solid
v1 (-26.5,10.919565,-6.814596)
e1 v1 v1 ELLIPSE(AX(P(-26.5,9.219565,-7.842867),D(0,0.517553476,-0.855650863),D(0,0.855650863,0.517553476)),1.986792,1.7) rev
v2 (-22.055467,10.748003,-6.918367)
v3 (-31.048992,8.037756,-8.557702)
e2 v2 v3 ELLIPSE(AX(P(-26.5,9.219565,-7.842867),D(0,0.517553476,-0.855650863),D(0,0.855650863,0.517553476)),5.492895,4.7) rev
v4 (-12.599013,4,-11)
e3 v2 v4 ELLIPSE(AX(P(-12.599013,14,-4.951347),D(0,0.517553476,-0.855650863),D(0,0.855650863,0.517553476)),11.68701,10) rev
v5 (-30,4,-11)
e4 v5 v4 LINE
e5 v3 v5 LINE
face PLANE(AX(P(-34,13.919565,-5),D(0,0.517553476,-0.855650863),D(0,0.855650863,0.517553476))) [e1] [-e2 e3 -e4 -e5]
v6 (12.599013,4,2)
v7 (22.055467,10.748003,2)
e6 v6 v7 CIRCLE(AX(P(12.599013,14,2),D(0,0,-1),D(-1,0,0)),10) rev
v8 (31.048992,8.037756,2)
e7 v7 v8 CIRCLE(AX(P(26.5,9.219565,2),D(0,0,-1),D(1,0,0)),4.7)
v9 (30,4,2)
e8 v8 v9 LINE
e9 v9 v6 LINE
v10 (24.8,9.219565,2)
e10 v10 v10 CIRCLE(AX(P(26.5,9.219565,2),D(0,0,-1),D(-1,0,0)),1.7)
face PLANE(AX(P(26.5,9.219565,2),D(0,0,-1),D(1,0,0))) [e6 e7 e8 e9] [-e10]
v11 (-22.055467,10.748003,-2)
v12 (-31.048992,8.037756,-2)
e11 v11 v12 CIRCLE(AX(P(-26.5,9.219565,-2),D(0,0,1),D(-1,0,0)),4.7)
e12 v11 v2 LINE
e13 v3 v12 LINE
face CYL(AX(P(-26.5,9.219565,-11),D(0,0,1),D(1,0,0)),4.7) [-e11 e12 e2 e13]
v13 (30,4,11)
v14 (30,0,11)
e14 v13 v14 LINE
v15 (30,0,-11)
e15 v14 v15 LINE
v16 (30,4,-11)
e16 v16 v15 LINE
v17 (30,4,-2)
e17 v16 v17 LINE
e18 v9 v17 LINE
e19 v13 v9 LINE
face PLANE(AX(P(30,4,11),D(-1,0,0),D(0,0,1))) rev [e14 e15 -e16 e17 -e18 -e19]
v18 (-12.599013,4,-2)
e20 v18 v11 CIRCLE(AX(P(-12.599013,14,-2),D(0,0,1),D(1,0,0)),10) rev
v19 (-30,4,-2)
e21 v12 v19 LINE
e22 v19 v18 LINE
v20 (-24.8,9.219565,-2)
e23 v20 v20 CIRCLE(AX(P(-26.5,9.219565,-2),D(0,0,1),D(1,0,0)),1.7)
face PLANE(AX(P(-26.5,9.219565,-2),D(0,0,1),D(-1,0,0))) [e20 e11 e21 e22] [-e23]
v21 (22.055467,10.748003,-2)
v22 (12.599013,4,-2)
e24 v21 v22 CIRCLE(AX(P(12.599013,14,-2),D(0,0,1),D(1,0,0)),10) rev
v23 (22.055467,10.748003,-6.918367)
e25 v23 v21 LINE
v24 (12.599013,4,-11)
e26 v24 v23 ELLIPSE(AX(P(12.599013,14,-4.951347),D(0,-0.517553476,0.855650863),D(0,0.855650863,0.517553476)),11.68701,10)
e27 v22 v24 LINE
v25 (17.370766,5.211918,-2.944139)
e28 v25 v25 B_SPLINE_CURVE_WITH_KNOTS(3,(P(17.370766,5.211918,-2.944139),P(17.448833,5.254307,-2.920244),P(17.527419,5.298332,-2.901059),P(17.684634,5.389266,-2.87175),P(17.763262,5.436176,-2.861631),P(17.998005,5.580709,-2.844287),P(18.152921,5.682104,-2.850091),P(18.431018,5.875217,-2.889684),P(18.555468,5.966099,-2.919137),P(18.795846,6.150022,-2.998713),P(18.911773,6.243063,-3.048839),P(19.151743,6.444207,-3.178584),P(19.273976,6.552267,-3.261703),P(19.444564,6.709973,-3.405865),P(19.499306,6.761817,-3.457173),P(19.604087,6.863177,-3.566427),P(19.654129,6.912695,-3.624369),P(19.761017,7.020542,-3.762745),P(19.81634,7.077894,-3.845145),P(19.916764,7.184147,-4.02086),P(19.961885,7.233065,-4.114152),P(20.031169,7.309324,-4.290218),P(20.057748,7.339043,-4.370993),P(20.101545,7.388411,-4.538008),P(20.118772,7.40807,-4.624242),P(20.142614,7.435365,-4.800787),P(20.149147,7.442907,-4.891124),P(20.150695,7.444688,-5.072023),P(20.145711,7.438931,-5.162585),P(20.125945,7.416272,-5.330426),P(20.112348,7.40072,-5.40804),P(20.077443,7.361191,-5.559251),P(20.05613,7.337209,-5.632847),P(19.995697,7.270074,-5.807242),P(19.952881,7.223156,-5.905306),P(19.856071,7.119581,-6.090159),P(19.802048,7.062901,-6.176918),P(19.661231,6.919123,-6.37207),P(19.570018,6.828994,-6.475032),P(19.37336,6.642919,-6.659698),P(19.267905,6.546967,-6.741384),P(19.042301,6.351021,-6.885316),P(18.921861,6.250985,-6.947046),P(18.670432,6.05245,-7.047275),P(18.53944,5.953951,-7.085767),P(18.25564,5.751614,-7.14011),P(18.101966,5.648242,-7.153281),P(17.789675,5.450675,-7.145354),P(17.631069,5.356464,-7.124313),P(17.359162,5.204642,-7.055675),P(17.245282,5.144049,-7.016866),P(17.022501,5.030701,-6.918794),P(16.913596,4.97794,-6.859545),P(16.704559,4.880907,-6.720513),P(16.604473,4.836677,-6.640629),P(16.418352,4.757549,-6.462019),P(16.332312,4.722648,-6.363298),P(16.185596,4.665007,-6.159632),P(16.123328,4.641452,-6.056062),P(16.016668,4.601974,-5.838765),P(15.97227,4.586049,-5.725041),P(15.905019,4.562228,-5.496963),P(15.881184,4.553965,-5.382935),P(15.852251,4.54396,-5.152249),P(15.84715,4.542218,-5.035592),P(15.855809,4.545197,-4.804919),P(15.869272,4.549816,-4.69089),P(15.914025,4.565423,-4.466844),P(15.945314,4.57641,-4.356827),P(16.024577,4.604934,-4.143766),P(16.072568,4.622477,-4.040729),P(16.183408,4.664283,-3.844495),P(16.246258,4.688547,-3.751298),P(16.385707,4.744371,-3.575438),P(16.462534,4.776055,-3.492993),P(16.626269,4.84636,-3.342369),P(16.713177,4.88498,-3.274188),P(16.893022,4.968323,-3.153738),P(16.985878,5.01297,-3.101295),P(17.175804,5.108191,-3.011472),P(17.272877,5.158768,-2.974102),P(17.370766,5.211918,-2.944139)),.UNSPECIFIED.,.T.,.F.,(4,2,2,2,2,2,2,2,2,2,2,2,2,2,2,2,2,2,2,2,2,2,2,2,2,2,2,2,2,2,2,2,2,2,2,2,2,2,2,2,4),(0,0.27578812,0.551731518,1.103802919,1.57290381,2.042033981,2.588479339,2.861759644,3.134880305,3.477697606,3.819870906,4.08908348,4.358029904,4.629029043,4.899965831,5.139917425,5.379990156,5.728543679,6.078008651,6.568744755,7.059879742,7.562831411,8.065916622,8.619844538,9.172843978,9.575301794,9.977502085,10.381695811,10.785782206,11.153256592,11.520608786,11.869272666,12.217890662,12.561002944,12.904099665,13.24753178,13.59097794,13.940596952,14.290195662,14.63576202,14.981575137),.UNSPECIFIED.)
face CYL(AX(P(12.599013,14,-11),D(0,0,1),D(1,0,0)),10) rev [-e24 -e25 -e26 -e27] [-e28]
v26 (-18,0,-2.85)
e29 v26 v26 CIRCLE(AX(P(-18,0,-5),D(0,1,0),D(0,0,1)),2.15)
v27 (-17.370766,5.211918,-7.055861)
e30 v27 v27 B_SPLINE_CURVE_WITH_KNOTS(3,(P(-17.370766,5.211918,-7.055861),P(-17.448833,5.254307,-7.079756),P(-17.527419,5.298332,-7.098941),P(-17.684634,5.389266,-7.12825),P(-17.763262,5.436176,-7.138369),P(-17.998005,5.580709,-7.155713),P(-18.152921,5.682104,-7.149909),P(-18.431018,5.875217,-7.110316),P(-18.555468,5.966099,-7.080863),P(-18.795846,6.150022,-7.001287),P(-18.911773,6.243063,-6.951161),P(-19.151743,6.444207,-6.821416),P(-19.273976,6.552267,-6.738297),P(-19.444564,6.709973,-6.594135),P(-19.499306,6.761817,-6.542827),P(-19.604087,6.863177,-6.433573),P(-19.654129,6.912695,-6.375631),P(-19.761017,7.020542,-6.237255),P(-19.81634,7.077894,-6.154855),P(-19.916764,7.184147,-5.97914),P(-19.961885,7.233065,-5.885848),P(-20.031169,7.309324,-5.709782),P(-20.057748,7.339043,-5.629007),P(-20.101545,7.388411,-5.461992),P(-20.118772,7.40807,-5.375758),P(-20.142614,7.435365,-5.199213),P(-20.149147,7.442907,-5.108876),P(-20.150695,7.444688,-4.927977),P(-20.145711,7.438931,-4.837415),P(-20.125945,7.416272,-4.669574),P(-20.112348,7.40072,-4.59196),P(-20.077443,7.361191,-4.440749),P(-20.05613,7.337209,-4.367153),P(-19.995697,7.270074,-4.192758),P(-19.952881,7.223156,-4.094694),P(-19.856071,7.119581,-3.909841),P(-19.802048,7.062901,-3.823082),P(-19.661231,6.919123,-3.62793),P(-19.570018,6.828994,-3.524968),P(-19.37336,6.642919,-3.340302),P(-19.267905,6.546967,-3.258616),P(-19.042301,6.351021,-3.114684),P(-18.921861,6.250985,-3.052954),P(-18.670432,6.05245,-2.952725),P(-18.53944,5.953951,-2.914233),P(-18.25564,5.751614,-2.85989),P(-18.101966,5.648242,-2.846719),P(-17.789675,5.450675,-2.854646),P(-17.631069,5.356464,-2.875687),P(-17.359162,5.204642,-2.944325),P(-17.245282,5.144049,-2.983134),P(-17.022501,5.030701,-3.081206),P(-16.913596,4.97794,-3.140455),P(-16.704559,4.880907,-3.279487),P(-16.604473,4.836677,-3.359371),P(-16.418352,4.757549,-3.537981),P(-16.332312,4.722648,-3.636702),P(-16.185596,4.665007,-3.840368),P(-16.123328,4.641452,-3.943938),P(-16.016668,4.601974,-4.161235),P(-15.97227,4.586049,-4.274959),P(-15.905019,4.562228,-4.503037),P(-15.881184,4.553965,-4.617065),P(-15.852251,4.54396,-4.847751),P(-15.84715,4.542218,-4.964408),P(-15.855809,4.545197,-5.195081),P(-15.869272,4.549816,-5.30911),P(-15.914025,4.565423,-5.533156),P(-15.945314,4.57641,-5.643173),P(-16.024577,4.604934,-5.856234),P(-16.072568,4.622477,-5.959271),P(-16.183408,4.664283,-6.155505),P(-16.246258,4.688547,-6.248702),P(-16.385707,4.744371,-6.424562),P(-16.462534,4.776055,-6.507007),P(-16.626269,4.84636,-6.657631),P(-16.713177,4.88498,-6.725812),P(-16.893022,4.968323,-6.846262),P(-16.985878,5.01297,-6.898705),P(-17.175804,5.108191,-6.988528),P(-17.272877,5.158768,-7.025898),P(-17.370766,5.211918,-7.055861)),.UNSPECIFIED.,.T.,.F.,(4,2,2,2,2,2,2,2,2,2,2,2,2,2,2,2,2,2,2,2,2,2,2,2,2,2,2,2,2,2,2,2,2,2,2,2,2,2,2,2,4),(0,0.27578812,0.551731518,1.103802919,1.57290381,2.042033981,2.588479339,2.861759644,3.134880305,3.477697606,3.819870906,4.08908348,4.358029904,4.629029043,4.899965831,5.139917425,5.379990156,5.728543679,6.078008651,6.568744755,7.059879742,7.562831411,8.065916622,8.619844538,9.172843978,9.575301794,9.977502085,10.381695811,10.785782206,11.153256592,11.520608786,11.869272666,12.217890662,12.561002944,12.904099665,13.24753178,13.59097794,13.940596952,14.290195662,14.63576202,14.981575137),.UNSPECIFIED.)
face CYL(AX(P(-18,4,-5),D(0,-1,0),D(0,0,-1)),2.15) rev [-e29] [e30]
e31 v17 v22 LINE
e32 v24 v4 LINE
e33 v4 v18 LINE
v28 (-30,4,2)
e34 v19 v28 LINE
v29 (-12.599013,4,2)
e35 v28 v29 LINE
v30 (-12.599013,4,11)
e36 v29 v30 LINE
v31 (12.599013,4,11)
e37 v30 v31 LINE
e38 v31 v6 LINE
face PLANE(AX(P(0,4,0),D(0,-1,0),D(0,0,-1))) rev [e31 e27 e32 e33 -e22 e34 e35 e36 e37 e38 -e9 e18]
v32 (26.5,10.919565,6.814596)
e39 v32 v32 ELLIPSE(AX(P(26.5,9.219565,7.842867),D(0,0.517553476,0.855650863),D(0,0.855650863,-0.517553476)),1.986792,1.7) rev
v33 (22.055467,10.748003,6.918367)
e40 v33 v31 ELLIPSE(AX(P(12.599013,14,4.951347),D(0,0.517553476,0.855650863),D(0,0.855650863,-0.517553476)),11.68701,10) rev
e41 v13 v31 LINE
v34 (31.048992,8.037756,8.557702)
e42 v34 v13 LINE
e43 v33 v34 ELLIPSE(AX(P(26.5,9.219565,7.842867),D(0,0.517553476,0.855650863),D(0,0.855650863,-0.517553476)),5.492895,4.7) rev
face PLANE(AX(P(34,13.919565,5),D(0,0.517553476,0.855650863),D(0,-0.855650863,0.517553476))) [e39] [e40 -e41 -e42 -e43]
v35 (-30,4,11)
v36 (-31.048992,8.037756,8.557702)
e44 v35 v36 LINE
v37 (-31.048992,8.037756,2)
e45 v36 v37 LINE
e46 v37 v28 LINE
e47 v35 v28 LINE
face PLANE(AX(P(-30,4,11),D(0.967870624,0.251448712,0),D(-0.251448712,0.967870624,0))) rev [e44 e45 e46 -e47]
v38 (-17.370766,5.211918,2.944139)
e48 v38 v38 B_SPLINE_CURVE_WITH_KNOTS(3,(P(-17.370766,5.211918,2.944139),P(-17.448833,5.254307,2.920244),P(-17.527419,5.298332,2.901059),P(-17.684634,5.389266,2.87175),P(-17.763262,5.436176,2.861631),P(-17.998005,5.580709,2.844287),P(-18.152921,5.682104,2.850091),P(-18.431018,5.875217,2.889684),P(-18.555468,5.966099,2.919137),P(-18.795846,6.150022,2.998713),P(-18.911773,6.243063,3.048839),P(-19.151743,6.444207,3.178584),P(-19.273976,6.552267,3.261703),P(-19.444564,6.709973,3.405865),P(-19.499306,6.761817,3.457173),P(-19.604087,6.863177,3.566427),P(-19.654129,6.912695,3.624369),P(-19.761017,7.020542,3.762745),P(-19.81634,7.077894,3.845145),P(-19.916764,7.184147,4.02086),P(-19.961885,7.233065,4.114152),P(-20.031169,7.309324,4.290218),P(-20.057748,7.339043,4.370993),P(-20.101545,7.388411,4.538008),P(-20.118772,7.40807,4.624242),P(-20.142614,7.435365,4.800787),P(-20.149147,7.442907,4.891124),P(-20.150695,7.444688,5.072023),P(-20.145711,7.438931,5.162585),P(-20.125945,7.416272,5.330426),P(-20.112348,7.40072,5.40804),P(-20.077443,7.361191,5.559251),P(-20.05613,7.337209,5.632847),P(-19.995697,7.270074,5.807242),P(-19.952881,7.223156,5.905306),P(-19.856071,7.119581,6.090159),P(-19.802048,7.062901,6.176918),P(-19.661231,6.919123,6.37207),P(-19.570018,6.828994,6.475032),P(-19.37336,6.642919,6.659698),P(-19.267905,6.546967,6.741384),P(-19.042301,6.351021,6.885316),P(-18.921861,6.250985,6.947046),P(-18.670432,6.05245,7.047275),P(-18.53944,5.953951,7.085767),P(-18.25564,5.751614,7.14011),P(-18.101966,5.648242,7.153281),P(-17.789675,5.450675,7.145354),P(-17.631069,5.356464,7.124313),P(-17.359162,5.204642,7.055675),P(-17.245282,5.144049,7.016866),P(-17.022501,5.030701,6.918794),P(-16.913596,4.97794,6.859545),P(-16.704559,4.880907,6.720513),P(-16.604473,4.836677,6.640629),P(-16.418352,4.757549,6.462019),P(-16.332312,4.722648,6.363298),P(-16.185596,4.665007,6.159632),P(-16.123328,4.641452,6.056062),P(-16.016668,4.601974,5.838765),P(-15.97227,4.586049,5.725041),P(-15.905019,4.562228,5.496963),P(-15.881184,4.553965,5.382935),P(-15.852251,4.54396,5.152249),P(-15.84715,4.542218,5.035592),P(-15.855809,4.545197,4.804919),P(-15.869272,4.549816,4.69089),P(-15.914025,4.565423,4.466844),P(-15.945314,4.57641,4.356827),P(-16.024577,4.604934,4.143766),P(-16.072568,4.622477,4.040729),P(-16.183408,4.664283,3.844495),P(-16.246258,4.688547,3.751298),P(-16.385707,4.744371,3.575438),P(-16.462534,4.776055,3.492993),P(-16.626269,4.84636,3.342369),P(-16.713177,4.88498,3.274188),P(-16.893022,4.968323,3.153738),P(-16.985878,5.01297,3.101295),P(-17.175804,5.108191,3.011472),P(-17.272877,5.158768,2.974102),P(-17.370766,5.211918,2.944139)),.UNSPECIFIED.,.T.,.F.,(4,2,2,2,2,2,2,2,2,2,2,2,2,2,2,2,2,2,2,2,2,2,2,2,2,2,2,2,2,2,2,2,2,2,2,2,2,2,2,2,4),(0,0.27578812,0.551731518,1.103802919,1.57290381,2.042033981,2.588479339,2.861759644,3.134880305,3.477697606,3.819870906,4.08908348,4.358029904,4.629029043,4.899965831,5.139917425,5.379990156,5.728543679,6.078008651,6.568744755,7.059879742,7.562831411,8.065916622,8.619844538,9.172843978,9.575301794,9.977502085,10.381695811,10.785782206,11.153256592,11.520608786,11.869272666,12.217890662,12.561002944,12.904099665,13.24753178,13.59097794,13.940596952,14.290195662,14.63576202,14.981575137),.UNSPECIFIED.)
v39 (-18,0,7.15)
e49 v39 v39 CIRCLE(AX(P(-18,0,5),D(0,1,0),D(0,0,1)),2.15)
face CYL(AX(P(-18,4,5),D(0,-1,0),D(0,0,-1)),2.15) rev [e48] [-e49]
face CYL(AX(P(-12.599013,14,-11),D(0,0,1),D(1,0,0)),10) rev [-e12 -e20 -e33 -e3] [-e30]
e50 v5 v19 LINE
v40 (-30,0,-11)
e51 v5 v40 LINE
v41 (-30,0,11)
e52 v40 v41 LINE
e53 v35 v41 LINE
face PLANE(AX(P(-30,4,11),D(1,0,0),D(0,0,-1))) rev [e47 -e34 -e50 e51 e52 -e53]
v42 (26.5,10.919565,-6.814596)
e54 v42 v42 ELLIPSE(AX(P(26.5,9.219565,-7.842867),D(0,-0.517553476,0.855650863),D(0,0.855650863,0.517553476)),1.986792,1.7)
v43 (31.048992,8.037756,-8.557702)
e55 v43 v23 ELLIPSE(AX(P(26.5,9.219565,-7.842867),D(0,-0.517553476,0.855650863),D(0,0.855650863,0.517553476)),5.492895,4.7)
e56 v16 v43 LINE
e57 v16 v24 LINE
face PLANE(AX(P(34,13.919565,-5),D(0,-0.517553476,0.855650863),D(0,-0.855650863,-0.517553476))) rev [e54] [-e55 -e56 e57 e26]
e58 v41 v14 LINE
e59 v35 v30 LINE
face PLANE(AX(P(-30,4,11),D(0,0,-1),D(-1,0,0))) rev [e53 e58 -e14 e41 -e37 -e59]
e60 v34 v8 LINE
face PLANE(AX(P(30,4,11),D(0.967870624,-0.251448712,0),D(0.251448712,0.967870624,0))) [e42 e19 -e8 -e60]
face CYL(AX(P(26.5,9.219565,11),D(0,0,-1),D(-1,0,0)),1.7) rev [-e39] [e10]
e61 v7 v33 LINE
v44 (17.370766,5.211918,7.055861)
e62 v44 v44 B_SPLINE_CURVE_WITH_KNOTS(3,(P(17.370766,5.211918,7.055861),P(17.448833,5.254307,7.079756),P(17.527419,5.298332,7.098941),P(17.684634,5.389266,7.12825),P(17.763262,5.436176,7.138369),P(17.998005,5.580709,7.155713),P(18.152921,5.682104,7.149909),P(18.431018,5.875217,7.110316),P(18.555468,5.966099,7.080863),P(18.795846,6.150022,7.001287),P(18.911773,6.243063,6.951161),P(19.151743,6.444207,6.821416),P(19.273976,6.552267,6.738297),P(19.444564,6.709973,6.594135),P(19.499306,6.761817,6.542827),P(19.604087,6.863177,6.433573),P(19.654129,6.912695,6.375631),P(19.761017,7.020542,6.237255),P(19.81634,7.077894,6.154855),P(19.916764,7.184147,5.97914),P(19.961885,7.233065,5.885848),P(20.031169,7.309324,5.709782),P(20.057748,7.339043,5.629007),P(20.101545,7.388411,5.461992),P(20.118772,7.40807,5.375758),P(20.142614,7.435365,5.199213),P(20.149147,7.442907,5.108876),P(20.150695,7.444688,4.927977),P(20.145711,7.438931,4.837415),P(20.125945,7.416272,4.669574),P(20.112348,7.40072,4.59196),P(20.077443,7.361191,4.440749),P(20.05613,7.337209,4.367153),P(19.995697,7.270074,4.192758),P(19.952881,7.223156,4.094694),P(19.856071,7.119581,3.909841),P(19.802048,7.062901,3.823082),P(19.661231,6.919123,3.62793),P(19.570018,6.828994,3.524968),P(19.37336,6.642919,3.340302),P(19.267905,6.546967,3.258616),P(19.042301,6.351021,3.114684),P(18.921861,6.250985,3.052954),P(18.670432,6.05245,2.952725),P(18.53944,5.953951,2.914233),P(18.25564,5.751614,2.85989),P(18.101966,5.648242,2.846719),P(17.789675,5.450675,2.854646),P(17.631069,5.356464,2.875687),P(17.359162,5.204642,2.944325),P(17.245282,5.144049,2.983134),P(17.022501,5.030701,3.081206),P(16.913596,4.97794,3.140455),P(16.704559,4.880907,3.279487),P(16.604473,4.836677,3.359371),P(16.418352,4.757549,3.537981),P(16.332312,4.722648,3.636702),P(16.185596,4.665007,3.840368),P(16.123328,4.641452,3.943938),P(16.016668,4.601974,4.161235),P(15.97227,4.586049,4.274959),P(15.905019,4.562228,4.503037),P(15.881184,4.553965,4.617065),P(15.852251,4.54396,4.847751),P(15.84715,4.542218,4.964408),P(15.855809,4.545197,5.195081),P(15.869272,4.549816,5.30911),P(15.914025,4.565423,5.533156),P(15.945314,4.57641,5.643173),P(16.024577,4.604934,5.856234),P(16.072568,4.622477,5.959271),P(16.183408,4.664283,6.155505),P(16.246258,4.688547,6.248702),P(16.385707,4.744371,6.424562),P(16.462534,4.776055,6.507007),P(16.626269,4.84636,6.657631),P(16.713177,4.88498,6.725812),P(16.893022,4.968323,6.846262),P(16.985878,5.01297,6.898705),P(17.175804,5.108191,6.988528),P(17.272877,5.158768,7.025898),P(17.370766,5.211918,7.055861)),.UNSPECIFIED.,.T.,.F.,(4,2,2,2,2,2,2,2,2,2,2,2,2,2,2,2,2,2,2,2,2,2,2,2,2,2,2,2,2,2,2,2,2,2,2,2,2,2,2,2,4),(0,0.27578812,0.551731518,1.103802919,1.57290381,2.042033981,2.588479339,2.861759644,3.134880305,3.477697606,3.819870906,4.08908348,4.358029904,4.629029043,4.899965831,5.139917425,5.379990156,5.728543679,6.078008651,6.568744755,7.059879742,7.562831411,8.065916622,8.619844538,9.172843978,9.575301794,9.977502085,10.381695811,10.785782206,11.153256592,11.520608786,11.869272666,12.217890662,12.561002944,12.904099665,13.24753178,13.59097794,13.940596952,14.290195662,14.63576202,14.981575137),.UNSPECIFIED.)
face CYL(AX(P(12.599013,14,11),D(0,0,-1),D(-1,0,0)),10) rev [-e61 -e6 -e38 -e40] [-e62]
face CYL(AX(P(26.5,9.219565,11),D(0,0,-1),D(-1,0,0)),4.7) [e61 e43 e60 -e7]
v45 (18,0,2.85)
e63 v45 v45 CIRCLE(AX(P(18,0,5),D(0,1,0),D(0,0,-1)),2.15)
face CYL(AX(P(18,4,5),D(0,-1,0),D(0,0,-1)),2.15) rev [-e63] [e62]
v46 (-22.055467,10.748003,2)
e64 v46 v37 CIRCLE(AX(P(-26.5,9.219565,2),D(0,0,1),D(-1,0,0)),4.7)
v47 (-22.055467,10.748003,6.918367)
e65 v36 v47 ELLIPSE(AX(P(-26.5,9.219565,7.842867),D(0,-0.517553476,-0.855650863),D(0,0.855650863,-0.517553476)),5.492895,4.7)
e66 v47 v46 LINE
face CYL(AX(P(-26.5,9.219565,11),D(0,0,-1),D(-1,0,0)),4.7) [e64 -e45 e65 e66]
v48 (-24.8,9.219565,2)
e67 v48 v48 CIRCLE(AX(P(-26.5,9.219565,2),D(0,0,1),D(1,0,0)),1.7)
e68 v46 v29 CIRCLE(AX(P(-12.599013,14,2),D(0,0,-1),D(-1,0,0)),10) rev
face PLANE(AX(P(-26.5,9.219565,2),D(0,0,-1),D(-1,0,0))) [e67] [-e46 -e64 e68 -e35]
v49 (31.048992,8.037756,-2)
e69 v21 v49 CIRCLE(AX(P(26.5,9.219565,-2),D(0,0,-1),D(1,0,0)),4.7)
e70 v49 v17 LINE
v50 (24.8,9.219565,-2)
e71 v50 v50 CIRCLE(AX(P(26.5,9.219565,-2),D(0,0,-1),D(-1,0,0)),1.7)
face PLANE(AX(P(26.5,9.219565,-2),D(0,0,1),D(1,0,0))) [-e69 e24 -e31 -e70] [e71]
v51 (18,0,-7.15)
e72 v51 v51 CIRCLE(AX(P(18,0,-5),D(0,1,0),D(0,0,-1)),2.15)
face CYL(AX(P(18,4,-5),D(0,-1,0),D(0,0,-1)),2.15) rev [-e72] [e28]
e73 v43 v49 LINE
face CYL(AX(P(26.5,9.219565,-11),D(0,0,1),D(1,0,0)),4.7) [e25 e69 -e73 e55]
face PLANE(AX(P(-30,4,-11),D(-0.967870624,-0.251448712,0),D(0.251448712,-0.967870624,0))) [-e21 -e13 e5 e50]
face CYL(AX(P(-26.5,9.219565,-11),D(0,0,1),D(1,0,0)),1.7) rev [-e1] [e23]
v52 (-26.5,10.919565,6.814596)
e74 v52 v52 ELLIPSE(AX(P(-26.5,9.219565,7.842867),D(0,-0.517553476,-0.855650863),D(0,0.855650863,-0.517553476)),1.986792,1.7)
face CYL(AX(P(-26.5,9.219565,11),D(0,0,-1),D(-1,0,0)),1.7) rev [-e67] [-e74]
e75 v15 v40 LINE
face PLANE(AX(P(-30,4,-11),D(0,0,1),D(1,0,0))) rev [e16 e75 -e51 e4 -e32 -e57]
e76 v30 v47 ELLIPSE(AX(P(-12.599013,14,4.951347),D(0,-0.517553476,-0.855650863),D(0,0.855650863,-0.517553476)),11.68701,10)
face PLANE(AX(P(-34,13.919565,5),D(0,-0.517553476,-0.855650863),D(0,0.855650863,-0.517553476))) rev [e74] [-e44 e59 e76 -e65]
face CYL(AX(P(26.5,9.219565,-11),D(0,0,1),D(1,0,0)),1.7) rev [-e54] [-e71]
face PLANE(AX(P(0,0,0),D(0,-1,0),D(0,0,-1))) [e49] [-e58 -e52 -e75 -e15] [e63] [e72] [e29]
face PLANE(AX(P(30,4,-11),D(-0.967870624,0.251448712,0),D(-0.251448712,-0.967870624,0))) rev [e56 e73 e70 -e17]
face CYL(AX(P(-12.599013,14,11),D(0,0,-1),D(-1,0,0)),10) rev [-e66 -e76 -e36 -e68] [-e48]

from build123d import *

# Parameters (mm, degrees)
SKETCH1_W               = 60
SKETCH1_H               = 22
SKETCH1_R               = 2.15
BOSS_EXTRUDE1_DEPTH     = 4
SKETCH2_R               = 1.7
BOSS_EXTRUDE2_DEPTH     = 9
CUT_EXTRUDE1_DEPTH      = 34
MIRROR5_COPY_1_SKETCH_R = 1.7
MIRROR5_COPY_1_DEPTH    = 9
MIRROR5_COPY_2_DEPTH    = 34
FILLET1_START           = -11.0000001
FILLET1_DEPTH           = 9.0000001
FILLET1_START_2         = 2
FILLET1_2_DEPTH         = 9
FILLET1_START_3         = 4
FILLET1_3_OUTLINE_R     = 2.15
FILLET1_3_DEPTH         = 4.037755723
FILLET1_START_4         = -30
FILLET1_4_DEPTH         = 60


with BuildPart() as part:
    # Sketch1 → Boss-Extrude1 (new body)
    with BuildSketch(Plane(origin=(0, 0, 0), x_dir=(1, 0, 0), z_dir=(0, 1, 0))):
        Rectangle(SKETCH1_W, SKETCH1_H)
        with Locations(Location((-18, 5, 0), (0, 0, 270))):
            Circle(SKETCH1_R, mode=Mode.SUBTRACT)
        with Locations(Location((-18, -5, 0), (0, 0, 270))):
            Circle(SKETCH1_R, mode=Mode.SUBTRACT)
        with Locations(Location((18, 5, 0), (0, 0, 90))):
            Circle(SKETCH1_R, mode=Mode.SUBTRACT)
        with Locations(Location((18, -5, 0), (0, 0, 90))):
            Circle(SKETCH1_R, mode=Mode.SUBTRACT)
    extrude(amount=BOSS_EXTRUDE1_DEPTH)

    # Sketch2 → Boss-Extrude2 (add)
    with BuildSketch(Plane.XY.offset(2)):
        with BuildLine():
            Line((-30, 4), (-31.048991933, 8.037755723))
            ThreePointArc((-31.048991933, 8.037755723), (-26.5, 13.919564671), (-21.951008067, 8.037755723))
            Line((-21.951008067, 8.037755723), (-23, 4))
            Line((-23, 4), (-30, 4))
        make_face()
        with Locations((-26.5, 9.219564671)):
            Circle(SKETCH2_R, mode=Mode.SUBTRACT)
    boss_extrude2 = extrude(amount=BOSS_EXTRUDE2_DEPTH)

    # Sketch3 → Cut-Extrude1 (cut)
    with BuildSketch(Plane(origin=(0, 0, 0), x_dir=(0, 0, -1), z_dir=(1, 0, 0))):
        Polygon((-5, 13.919564671), (-11, 4), (-11, 13.919564671), align=None)
    cut_extrude1 = extrude(amount=-CUT_EXTRUDE1_DEPTH, mode=Mode.SUBTRACT)

    # Mirror4: Boss-Extrude2, Cut-Extrude1 across plane
    add(boss_extrude2.mirror(Plane.XY))
    add(cut_extrude1.mirror(Plane.XY), mode=Mode.SUBTRACT)

    # Mirror5: Boss-Extrude2, Cut-Extrude1 across plane
    add(boss_extrude2.mirror(Plane(origin=(0, 0, 0), x_dir=(0, 0, 1), z_dir=(1, 0, 0))))
    add(cut_extrude1.mirror(Plane(origin=(0, 0, 0), x_dir=(0, 0, 1), z_dir=(1, 0, 0))), mode=Mode.SUBTRACT)

    # Mirror5 copy 1 sketch → Mirror5 copy 1 (add)
    with BuildSketch(Plane(origin=(0, 0, -2), x_dir=(-1, 0, 0), z_dir=(0, 0, -1))):
        with BuildLine():
            Line((-30, 4), (-31.048991933, 8.037755723))
            ThreePointArc((-31.048991933, 8.037755723), (-26.5, 13.919564671), (-21.951008067, 8.037755723))
            Line((-21.951008067, 8.037755723), (-23, 4))
            Line((-23, 4), (-30, 4))
        make_face()
        with Locations((-26.5, 9.219564671)):
            Circle(MIRROR5_COPY_1_SKETCH_R, mode=Mode.SUBTRACT)
    extrude(amount=MIRROR5_COPY_1_DEPTH)

    # Mirror5 copy 2 sketch → Mirror5 copy 2 (cut)
    with BuildSketch(Plane.ZY):
        Polygon((-5, 13.919564671), (-11, 4), (-11, 13.919564671), align=None)
    extrude(amount=-MIRROR5_COPY_2_DEPTH, mode=Mode.SUBTRACT)

    # Fillet1: read off the stored shape, not the designer's step
    # Fillet1 outline → Fillet1 (add)
    with BuildSketch(Plane.XY.offset(FILLET1_START)):
        with BuildLine():
            ThreePointArc((21.951008067, 8.037755723), (21.80348703, 9.400578254), (22.055466759, 10.748003177))
            ThreePointArc((22.055466759, 10.748003177), (18.407628714, 5.859976406), (12.599013054, 4))
            Line((12.599013054, 4), (23, 4))
            Line((23, 4), (21.951008067, 8.037755723))
        make_face()
        with BuildLine():
            Line((-23, 4), (-12.599013054, 4))
            ThreePointArc((-12.599013054, 4), (-18.407628714, 5.859976406), (-22.055466759, 10.748003177))
            ThreePointArc((-22.055466759, 10.748003177), (-21.80348703, 9.400578254), (-21.951008067, 8.037755723))
            Line((-21.951008067, 8.037755723), (-23, 4))
        make_face()
    extrude(amount=FILLET1_DEPTH)

    # Fillet1 2 outline → Fillet1 2 (add)
    with BuildSketch(Plane.XY.offset(FILLET1_START_2)):
        with BuildLine():
            ThreePointArc((21.951008067, 8.037755723), (21.80348703, 9.400578254), (22.055466759, 10.748003177))
            ThreePointArc((22.055466759, 10.748003177), (18.407628714, 5.859976406), (12.599013054, 4))
            Line((12.599013054, 4), (23, 4))
            Line((23, 4), (21.951008067, 8.037755723))
        make_face()
        with BuildLine():
            Line((-23, 4), (-12.599013054, 4))
            ThreePointArc((-12.599013054, 4), (-18.407628714, 5.859976406), (-22.055466759, 10.748003177))
            ThreePointArc((-22.055466759, 10.748003177), (-21.80348703, 9.400578254), (-21.951008067, 8.037755723))
            Line((-21.951008067, 8.037755723), (-23, 4))
        make_face()
    extrude(amount=FILLET1_2_DEPTH)

    # Fillet1 3 outline → Fillet1 3 (cut)
    with BuildSketch(Plane(origin=(0, 0, 0), x_dir=(1, 0, 0), z_dir=(0, 1, 0)).offset(FILLET1_START_3)):
        with Locations((-18, -5)):
            Circle(FILLET1_3_OUTLINE_R)
        with Locations((-18, 5)):
            Circle(FILLET1_3_OUTLINE_R)
        with Locations((18, 5)):
            Circle(FILLET1_3_OUTLINE_R)
        with Locations((18, -5)):
            Circle(FILLET1_3_OUTLINE_R)
    extrude(amount=FILLET1_3_DEPTH, mode=Mode.SUBTRACT)

    # Fillet1 4 outline → Fillet1 4 (cut)
    with BuildSketch(Plane.YZ.offset(FILLET1_START_4)):
        Polygon((12, 11), (4, 11), (12, 6.161077971), align=None)
        Polygon((12, -11), (12, -6.161077971), (4, -11), align=None)
    extrude(amount=FILLET1_4_DEPTH, mode=Mode.SUBTRACT)


solid = part.part
